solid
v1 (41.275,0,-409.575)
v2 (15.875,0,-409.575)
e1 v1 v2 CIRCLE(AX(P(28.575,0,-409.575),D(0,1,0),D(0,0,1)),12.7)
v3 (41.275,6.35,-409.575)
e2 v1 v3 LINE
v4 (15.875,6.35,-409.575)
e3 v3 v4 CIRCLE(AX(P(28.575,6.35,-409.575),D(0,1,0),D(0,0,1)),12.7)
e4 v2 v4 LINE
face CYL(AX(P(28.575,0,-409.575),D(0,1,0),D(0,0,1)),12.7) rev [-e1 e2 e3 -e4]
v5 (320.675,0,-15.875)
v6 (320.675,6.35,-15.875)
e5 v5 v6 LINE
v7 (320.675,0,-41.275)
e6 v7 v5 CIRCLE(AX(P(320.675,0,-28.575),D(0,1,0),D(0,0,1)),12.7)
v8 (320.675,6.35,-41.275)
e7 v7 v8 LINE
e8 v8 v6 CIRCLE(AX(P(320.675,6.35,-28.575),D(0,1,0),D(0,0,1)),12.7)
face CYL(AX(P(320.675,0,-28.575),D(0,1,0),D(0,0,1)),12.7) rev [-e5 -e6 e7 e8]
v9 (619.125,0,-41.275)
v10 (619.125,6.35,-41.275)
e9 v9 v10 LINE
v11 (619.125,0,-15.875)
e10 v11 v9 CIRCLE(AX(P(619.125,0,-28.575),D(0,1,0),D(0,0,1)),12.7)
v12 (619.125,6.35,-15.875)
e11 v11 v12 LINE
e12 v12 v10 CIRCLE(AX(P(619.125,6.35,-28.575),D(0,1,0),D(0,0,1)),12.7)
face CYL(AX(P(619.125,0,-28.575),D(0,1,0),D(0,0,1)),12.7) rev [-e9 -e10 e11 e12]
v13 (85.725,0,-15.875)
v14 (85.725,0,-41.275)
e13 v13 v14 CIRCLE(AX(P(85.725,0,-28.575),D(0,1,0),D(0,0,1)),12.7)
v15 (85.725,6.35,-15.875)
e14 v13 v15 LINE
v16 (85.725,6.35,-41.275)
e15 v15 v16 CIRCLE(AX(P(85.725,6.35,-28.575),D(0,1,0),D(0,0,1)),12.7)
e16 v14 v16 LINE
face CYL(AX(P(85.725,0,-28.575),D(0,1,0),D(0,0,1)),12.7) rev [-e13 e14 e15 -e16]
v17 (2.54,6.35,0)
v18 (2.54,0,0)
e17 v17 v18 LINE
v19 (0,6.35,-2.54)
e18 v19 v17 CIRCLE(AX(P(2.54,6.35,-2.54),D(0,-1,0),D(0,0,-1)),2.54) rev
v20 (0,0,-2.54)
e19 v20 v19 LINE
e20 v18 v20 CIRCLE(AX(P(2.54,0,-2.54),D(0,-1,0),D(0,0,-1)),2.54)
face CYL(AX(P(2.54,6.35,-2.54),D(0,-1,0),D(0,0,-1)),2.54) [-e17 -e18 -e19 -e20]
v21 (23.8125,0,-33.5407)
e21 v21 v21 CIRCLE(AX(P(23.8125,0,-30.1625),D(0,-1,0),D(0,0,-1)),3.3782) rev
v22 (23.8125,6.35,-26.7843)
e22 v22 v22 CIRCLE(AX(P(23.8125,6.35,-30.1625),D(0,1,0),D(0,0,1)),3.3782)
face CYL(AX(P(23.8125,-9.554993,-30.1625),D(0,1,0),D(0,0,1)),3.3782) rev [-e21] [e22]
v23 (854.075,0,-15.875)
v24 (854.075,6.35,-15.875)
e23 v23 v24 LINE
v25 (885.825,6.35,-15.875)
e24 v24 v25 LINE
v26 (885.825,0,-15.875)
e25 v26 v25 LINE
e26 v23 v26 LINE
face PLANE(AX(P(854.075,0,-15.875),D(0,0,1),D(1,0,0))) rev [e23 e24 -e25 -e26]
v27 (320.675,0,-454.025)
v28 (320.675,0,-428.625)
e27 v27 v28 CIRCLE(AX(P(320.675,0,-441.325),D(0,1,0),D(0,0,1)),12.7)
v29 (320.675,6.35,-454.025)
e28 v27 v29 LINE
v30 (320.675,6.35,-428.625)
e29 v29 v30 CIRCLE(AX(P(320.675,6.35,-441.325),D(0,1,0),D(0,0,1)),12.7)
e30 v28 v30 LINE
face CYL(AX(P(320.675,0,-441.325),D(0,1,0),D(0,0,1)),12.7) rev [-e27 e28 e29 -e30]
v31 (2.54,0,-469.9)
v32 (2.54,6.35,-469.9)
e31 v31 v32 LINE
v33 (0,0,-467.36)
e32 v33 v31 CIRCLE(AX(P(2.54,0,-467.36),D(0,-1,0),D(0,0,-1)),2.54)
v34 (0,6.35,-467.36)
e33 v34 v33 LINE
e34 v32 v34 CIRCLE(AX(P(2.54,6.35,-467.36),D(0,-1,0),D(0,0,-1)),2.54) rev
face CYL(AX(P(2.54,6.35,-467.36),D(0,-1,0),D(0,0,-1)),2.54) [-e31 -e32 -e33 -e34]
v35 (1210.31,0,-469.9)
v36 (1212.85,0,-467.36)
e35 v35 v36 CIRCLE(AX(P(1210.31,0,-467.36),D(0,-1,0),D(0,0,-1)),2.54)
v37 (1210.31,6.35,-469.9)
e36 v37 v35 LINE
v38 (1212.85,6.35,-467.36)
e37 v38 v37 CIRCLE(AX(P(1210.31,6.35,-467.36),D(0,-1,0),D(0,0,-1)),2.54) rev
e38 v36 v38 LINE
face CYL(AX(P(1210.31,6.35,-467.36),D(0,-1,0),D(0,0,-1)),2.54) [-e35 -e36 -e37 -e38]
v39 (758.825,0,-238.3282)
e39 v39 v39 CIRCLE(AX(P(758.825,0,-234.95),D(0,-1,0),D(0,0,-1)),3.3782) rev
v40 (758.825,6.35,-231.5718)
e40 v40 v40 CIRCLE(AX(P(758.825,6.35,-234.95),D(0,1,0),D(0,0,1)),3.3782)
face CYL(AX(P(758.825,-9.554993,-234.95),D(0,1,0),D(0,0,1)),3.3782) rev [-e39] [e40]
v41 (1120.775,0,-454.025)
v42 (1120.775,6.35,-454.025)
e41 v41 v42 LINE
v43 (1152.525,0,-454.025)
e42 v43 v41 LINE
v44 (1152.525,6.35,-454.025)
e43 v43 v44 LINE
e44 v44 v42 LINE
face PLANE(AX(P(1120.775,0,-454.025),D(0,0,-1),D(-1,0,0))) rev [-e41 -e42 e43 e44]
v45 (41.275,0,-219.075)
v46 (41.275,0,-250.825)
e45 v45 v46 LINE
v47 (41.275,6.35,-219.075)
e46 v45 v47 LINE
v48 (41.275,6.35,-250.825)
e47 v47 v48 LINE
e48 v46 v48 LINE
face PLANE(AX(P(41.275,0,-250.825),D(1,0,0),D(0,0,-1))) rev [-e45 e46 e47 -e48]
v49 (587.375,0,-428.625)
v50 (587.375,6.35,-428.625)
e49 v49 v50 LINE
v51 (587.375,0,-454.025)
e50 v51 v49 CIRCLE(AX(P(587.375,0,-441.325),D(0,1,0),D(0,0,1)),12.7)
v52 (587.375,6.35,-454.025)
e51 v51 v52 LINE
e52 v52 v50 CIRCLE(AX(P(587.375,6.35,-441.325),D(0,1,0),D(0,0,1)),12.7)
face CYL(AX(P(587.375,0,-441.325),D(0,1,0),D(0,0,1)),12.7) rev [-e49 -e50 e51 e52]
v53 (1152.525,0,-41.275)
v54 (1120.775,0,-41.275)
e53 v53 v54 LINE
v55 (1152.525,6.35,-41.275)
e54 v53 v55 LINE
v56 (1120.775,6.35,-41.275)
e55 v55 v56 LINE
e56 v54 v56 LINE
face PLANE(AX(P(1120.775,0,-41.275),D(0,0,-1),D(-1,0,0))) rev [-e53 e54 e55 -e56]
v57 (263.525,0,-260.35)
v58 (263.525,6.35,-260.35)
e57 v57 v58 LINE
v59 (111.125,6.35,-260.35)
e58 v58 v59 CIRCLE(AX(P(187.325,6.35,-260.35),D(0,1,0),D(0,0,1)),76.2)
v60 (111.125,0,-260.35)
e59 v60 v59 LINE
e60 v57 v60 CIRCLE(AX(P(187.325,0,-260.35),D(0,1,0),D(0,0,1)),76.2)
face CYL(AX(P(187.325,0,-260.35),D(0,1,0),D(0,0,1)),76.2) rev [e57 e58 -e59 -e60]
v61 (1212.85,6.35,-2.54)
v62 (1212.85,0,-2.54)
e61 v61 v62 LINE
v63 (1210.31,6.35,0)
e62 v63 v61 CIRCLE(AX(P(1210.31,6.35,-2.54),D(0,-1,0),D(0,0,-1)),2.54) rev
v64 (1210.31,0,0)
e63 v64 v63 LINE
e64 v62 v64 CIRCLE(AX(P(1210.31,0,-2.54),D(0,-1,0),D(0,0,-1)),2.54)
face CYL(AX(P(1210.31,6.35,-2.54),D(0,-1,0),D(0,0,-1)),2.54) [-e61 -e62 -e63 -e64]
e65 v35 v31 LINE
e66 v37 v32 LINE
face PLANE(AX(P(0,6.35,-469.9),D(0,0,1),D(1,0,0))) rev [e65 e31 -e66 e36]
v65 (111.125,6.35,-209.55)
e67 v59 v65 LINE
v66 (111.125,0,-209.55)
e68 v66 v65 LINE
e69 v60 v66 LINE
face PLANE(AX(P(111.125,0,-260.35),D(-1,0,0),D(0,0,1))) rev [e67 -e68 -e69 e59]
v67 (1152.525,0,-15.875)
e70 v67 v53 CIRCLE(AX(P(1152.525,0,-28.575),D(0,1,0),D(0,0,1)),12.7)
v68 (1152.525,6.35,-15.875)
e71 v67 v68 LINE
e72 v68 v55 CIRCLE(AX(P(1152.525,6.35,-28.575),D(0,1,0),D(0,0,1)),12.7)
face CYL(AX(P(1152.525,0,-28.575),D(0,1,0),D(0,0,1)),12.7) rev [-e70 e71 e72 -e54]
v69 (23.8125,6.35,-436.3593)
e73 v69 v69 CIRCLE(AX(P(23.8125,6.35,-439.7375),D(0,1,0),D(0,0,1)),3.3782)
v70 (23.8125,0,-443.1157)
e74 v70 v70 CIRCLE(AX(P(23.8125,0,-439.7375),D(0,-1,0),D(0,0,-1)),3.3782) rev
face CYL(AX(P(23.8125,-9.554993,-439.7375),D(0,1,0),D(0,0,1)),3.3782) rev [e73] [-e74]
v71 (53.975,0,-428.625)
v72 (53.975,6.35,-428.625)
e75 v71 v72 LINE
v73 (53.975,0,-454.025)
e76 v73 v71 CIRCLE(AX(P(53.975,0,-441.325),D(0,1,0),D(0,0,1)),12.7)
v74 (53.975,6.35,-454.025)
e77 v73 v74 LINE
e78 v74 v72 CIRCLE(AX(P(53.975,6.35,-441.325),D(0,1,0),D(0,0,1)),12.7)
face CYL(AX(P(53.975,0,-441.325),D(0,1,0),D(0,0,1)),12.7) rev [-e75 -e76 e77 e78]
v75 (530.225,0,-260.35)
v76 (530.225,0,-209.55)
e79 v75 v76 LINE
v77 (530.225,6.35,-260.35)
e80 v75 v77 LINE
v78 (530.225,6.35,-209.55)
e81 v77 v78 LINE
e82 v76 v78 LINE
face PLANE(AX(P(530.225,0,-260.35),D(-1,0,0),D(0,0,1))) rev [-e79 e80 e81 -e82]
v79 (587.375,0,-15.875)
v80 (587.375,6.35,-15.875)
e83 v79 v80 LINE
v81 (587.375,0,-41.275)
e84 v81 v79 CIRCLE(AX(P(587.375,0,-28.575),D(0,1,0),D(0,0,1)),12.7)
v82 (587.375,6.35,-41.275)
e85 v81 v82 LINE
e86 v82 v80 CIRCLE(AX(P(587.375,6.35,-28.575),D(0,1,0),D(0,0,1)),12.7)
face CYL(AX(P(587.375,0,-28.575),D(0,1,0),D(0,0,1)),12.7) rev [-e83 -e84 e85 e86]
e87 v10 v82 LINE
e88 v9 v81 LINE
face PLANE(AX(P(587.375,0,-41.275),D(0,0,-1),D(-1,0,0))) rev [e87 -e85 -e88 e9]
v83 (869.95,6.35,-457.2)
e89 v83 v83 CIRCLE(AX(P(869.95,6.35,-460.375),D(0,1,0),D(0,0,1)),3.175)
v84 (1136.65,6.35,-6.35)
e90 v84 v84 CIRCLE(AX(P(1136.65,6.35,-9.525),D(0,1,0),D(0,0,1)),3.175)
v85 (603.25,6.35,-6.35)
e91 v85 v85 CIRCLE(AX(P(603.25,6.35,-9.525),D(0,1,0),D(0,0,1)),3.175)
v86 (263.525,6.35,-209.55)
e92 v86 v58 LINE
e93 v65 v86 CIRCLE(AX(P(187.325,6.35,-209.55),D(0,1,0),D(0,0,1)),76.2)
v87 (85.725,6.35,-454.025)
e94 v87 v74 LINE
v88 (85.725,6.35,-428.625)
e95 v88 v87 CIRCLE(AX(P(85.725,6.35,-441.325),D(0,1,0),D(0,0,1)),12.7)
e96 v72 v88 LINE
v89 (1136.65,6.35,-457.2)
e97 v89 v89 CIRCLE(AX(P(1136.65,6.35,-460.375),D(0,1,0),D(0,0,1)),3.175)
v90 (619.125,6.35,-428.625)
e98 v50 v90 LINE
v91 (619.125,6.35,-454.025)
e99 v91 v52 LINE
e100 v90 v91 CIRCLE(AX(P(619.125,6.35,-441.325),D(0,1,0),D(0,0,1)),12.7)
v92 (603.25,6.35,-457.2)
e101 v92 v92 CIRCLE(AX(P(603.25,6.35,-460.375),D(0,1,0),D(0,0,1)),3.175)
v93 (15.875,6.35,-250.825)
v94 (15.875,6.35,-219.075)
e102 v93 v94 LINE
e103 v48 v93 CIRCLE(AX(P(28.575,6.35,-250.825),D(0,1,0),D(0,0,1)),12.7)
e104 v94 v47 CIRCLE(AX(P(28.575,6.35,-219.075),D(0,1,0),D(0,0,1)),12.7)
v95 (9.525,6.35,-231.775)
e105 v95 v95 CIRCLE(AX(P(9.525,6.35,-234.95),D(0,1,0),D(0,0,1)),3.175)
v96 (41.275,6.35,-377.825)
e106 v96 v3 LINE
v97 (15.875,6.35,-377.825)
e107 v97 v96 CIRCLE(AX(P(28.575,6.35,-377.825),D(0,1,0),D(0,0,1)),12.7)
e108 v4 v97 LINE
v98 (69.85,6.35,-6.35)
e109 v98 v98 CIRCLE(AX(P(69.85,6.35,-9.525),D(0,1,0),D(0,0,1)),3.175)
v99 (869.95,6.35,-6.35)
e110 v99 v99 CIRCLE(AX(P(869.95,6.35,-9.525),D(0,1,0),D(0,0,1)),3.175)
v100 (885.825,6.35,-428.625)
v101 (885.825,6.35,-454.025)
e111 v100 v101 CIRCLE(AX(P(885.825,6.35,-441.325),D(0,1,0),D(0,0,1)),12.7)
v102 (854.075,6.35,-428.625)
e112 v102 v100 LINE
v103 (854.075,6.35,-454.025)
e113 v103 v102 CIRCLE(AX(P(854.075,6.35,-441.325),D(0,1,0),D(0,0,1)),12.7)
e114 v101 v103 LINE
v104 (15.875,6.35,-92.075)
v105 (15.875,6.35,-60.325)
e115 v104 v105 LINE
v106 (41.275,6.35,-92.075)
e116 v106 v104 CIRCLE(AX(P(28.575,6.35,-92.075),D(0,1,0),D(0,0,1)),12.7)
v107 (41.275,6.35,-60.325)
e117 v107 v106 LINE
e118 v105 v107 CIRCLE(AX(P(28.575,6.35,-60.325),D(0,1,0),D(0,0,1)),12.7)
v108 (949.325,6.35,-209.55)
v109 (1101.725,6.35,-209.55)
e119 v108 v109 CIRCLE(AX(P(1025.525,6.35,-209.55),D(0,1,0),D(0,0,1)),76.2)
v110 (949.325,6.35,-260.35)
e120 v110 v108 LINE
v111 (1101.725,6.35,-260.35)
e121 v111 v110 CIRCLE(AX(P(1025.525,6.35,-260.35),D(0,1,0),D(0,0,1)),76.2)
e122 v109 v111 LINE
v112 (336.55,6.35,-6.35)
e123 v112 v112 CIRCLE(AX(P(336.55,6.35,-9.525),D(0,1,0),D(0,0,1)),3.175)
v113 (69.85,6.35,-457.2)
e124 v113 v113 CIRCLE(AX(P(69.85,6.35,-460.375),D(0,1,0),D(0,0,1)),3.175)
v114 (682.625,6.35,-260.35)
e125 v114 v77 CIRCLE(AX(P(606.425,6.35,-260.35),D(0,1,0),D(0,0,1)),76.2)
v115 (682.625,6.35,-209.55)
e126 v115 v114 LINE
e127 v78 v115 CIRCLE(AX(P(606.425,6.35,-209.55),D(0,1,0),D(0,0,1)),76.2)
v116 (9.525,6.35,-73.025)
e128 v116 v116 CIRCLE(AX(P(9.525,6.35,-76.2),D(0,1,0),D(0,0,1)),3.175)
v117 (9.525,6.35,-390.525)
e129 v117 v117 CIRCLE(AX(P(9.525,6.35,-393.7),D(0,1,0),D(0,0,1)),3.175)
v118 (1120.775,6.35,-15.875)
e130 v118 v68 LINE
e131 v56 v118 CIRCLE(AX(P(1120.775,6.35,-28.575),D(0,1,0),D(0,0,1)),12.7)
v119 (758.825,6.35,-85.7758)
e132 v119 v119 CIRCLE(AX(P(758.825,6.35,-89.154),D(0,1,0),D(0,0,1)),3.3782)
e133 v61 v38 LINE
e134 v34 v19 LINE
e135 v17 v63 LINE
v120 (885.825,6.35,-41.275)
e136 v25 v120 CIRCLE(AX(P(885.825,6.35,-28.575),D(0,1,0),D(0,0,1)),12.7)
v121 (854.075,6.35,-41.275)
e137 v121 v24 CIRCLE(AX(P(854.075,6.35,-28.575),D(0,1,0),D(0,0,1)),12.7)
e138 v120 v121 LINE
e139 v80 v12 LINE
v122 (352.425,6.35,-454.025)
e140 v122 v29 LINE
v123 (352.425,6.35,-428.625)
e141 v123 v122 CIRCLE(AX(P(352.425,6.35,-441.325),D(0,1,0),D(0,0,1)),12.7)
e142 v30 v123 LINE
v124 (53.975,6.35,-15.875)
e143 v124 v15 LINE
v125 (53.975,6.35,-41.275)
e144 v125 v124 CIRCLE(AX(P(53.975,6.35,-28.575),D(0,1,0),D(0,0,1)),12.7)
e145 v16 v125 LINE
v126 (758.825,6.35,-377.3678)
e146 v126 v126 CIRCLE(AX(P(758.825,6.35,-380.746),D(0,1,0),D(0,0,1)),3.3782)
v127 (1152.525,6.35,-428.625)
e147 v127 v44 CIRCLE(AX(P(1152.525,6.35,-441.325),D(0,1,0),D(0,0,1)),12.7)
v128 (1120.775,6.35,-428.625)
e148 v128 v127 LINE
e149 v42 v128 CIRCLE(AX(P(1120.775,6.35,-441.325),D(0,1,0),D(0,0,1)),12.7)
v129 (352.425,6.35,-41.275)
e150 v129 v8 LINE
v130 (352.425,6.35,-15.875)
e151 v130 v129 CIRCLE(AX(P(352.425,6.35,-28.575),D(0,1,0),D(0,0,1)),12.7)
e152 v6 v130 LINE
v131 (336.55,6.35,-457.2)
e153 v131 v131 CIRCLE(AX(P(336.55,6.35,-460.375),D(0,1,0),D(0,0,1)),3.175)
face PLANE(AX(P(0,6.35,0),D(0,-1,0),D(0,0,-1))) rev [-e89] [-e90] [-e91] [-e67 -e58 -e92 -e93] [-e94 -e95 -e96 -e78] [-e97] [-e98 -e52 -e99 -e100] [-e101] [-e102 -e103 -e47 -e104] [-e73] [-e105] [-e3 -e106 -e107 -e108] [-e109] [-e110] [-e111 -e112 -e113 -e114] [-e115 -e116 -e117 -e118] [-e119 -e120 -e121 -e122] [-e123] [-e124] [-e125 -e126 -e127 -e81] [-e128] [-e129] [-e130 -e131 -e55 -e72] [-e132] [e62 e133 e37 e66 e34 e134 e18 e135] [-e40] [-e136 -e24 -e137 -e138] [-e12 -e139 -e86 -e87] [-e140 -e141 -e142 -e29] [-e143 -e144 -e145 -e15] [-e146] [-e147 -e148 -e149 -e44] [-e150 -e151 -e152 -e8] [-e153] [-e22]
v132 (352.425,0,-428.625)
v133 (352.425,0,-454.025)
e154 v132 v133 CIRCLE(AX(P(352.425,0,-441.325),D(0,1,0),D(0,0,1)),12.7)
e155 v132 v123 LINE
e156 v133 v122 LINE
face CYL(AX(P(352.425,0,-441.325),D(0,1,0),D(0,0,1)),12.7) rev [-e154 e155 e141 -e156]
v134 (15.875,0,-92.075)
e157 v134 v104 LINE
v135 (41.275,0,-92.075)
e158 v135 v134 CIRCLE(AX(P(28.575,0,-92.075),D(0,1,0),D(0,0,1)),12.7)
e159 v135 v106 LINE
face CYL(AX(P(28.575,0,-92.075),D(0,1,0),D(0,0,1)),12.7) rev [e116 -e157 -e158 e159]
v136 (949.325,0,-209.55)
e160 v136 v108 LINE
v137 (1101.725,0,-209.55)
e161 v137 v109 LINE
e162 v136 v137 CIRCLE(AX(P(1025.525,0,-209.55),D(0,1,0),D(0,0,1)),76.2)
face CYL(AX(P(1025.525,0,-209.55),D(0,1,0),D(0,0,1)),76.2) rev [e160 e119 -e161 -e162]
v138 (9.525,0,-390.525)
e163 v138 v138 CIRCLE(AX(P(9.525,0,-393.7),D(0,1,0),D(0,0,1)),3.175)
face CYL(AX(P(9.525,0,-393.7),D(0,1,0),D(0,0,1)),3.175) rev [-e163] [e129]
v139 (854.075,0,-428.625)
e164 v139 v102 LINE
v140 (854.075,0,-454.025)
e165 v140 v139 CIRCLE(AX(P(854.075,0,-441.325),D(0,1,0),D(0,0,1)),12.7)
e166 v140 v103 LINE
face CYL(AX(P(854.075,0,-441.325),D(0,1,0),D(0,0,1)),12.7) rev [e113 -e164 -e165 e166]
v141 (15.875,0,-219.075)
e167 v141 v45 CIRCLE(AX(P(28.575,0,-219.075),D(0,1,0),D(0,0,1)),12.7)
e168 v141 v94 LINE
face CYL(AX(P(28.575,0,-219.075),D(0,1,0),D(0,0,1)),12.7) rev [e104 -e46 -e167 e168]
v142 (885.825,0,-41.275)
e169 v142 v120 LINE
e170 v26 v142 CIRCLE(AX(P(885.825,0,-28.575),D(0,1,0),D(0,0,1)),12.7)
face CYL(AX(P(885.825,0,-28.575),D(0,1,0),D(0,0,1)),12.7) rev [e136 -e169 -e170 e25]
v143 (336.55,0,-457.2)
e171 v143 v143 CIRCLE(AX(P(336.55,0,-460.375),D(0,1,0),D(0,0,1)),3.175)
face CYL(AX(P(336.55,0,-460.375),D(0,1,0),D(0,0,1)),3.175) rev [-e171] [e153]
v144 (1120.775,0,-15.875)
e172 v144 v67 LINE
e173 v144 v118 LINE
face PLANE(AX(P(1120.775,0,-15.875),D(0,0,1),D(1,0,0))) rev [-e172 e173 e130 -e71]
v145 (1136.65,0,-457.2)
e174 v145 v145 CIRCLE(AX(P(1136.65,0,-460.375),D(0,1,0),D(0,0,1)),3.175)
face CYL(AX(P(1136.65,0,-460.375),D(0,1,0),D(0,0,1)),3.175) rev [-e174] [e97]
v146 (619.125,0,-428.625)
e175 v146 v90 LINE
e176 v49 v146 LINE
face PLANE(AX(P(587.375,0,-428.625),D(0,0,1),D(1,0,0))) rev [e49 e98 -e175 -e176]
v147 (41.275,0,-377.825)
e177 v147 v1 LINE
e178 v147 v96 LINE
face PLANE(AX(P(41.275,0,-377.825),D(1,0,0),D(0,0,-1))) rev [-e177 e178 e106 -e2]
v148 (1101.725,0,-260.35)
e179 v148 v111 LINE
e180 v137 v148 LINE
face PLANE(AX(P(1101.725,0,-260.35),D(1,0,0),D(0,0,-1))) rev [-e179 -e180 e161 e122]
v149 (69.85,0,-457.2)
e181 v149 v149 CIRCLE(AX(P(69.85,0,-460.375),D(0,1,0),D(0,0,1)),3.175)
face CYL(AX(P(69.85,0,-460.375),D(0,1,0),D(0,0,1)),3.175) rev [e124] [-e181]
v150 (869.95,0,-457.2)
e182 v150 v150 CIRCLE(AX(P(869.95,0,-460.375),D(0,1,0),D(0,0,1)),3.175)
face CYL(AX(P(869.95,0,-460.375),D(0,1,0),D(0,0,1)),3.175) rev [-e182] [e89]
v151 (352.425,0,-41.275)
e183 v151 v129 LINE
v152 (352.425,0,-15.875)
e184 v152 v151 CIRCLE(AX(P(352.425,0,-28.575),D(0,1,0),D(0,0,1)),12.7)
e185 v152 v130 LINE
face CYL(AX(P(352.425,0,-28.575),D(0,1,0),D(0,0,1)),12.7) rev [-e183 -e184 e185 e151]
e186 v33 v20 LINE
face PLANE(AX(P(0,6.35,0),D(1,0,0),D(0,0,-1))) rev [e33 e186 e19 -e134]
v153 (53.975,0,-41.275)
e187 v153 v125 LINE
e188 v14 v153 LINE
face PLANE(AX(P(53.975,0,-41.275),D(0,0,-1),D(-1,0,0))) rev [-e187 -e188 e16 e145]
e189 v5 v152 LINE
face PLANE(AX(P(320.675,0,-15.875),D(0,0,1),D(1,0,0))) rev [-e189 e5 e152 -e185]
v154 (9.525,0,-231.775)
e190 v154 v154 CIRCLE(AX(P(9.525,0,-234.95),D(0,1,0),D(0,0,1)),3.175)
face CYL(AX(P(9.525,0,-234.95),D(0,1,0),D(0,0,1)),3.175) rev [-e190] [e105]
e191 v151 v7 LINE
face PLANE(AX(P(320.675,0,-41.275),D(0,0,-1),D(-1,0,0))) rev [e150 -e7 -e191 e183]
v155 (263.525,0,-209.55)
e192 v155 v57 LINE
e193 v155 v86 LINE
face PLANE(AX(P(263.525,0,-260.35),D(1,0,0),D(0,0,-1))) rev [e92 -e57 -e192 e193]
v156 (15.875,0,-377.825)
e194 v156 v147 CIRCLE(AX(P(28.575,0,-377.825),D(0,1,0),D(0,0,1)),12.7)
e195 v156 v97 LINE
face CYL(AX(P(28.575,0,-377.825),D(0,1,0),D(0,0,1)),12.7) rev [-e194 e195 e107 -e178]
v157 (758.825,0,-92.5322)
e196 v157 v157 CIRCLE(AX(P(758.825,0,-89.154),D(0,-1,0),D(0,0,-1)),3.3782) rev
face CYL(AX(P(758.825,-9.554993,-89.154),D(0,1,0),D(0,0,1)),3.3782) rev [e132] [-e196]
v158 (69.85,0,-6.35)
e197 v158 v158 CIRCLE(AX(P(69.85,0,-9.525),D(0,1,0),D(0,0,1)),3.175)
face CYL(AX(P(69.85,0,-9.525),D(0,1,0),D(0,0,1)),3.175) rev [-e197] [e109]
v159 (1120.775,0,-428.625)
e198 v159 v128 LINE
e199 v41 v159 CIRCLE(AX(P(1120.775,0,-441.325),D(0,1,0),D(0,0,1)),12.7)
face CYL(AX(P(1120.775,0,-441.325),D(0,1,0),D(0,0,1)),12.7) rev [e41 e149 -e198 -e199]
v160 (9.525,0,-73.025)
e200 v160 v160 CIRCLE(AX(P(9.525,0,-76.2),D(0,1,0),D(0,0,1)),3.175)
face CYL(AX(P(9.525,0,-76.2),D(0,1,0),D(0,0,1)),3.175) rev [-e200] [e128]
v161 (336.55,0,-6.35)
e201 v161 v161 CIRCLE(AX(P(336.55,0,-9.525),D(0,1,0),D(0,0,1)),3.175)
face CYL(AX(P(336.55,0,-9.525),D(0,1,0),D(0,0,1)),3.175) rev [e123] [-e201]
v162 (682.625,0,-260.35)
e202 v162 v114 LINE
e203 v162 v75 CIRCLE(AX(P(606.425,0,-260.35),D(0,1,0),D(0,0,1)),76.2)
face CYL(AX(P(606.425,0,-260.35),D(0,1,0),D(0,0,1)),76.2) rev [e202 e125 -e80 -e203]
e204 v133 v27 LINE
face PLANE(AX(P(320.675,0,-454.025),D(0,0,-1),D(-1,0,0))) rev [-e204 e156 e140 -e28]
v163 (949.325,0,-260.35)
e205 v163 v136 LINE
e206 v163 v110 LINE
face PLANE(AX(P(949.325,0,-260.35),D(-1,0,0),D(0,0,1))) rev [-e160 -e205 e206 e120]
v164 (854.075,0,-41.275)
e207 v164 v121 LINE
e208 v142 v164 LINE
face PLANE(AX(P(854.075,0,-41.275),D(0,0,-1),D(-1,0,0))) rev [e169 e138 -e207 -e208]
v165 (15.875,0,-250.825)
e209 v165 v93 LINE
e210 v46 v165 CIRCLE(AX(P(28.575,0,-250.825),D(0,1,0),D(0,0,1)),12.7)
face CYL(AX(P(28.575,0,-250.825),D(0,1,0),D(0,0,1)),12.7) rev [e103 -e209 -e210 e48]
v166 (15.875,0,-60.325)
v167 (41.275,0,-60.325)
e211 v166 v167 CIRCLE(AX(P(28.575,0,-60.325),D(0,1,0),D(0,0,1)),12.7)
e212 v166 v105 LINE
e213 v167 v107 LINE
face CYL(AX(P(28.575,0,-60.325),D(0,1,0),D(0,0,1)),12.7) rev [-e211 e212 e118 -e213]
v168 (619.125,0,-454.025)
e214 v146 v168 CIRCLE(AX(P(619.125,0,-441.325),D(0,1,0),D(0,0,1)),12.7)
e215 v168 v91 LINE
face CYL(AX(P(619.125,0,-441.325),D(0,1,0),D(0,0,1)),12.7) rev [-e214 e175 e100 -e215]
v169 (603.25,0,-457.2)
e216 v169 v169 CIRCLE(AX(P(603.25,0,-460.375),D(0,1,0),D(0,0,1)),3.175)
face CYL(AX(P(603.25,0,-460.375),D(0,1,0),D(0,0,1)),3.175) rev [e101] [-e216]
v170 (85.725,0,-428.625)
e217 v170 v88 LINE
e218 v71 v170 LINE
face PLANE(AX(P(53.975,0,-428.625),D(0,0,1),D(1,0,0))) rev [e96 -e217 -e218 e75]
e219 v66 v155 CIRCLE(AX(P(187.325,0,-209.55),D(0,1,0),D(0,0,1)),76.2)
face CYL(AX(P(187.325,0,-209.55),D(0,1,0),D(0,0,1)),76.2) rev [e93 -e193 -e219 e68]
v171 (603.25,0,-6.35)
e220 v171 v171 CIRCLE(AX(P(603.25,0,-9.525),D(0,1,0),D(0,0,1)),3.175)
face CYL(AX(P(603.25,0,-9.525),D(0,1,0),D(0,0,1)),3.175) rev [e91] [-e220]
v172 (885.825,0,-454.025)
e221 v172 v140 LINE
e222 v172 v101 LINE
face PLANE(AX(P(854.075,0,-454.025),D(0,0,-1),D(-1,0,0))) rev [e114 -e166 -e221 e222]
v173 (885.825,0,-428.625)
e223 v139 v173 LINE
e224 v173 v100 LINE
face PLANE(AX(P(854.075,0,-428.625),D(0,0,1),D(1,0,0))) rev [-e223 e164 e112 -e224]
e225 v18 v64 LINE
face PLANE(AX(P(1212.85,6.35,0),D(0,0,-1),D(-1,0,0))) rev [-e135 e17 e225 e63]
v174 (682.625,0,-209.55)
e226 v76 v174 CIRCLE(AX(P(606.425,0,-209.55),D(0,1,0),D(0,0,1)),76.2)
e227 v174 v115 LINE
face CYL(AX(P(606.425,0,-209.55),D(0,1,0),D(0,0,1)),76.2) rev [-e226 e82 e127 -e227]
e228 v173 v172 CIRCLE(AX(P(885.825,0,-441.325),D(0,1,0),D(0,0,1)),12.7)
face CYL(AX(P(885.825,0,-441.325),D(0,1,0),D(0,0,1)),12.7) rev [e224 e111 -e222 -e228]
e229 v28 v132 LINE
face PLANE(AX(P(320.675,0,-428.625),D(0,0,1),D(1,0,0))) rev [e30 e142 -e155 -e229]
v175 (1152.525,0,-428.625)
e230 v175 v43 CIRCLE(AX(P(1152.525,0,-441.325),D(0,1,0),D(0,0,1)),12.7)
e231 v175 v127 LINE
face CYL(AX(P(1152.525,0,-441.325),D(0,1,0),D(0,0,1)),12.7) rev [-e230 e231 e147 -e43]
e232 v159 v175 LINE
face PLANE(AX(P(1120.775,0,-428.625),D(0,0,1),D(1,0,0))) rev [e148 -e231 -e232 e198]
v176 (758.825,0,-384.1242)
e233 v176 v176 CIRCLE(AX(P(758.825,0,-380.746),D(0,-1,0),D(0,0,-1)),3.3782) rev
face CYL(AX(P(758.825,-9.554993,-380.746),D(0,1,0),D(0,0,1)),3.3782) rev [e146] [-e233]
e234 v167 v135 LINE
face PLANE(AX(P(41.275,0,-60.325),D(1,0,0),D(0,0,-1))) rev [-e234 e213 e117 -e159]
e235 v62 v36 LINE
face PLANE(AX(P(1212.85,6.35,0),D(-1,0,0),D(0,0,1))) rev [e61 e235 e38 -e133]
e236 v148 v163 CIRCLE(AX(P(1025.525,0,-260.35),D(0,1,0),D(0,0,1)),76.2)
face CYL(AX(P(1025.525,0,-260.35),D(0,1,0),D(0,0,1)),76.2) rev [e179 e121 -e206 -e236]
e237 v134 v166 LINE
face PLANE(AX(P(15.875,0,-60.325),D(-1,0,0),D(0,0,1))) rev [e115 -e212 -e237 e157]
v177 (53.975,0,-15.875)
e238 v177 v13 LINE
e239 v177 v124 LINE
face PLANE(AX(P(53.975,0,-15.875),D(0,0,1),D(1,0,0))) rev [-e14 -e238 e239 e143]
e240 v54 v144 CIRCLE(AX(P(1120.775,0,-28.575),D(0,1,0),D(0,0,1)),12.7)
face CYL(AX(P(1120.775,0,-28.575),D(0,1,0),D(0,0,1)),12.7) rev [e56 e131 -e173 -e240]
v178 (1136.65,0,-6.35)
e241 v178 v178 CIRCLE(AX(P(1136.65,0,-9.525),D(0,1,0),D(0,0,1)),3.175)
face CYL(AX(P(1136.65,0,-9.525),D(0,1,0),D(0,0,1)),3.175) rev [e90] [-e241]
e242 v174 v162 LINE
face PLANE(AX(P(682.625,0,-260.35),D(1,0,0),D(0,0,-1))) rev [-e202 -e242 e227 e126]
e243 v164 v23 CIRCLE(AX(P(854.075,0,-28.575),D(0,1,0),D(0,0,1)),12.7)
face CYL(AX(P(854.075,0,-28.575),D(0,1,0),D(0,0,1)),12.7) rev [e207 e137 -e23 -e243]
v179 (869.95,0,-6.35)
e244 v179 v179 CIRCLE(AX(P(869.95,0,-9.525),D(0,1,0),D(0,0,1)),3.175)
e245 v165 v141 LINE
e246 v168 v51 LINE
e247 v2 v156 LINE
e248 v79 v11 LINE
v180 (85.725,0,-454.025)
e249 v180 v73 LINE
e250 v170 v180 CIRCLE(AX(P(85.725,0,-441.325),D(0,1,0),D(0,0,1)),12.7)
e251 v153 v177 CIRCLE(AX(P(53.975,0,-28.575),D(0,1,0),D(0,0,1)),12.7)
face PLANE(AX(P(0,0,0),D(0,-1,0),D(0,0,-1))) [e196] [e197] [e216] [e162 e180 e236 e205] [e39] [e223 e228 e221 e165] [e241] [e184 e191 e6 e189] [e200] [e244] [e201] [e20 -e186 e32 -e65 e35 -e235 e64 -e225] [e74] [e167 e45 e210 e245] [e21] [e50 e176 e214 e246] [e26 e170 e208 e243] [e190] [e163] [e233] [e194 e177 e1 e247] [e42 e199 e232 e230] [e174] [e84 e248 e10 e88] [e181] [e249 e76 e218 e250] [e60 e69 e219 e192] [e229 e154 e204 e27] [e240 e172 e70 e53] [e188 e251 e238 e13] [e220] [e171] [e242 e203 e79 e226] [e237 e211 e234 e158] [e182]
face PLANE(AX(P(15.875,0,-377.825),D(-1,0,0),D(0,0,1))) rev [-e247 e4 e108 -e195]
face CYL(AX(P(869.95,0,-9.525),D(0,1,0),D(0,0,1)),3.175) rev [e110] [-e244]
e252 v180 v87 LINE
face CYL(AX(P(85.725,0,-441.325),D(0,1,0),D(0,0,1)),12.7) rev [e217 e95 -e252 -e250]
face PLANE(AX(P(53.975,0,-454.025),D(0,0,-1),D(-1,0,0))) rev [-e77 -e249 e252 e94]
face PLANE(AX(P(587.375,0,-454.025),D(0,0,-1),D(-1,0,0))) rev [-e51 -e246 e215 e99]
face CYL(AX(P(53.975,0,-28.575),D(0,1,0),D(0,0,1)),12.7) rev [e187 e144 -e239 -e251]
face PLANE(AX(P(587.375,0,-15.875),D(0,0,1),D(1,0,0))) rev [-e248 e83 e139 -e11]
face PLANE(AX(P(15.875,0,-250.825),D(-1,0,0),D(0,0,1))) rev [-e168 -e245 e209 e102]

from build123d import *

# Parameters (mm, degrees)
SKETCH1_W           = 1212.85
SKETCH1_H           = 469.9
BOSS_EXTRUDE1_DEPTH = 6.35
CUT_EXTRUDE1_DEPTH  = 1301.711903152
SKETCH4_R           = 3.175
CUT_EXTRUDE3_DEPTH  = 1301.711903152
LPATTERN1_OUTLINE_R = 3.175
LPATTERN1_DEPTH     = 6.35
FILLET1_R           = 2.54
SKETCH5_R           = 3.3782
CUT_EXTRUDE4_DEPTH  = 6.35


# Read off the part's stored shape, not the designer's step: LPattern1
with BuildPart() as part:
    # Sketch1 → Boss-Extrude1 (new body)
    with BuildSketch(Plane(origin=(0, 0, 0), x_dir=(1, 0, 0), z_dir=(0, 1, 0))):
        with Locations((606.425, 234.95)):
            Rectangle(SKETCH1_W, SKETCH1_H)
    extrude(amount=BOSS_EXTRUDE1_DEPTH)

    # Sketch2 → Cut-Extrude1 (cut, through all)
    with BuildSketch(Plane(origin=(0, 6.35, 0), x_dir=(1, 0, 0), z_dir=(0, 1, 0))):
        with BuildLine():
            Line((263.525, 260.35), (263.525, 209.55))
            ThreePointArc((263.525, 209.55), (187.325, 133.35), (111.125, 209.55))
            Line((111.125, 209.55), (111.125, 260.35))
            ThreePointArc((111.125, 260.35), (187.325, 336.55), (263.525, 260.35))
        make_face()
        with BuildLine():
            Line((682.625, 260.35), (682.625, 209.55))
            ThreePointArc((682.625, 209.55), (606.425, 133.35), (530.225, 209.55))
            Line((530.225, 209.55), (530.225, 260.35))
            ThreePointArc((530.225, 260.35), (606.425, 336.55), (682.625, 260.35))
        make_face()
        with BuildLine():
            Line((1101.725, 260.35), (1101.725, 209.55))
            ThreePointArc((1101.725, 209.55), (1025.525, 133.35), (949.325, 209.55))
            Line((949.325, 209.55), (949.325, 260.35))
            ThreePointArc((949.325, 260.35), (1025.525, 336.55), (1101.725, 260.35))
        make_face()
    extrude(amount=-CUT_EXTRUDE1_DEPTH, mode=Mode.SUBTRACT)

    # Sketch4 → Cut-Extrude3 (cut, through all)
    with BuildSketch(Plane(origin=(0, 6.35, 0), x_dir=(1, 0, 0), z_dir=(0, 1, 0))):
        with Locations(Location((9.525, 393.7, 0), (0, 0, 270))):
            Circle(SKETCH4_R)
        with Locations(Location((9.525, 234.95, 0), (0, 0, 270))):
            Circle(SKETCH4_R)
        with Locations(Location((9.525, 76.2, 0), (0, 0, 270))):
            Circle(SKETCH4_R)
        with Locations(Location((69.85, 460.375, 0), (0, 0, 270))):
            Circle(SKETCH4_R)
        with Locations(Location((69.85, 9.525, 0), (0, 0, 270))):
            Circle(SKETCH4_R)
        with BuildLine():
            Line((41.275, 250.825), (41.275, 219.075))
            ThreePointArc((41.275, 219.075), (28.575, 206.375), (15.875, 219.075))
            Line((15.875, 219.075), (15.875, 250.825))
            ThreePointArc((15.875, 250.825), (28.575, 263.525), (41.275, 250.825))
        make_face()
        with BuildLine():
            Line((53.975, 454.025), (85.725, 454.025))
            ThreePointArc((85.725, 454.025), (98.425, 441.325), (85.725, 428.625))
            Line((85.725, 428.625), (53.975, 428.625))
            ThreePointArc((53.975, 428.625), (41.275, 441.325), (53.975, 454.025))
        make_face()
        with BuildLine():
            Line((53.975, 41.275), (85.725, 41.275))
            ThreePointArc((85.725, 41.275), (98.425, 28.575), (85.725, 15.875))
            Line((85.725, 15.875), (53.975, 15.875))
            ThreePointArc((53.975, 15.875), (41.275, 28.575), (53.975, 41.275))
        make_face()
        with BuildLine():
            Line((15.875, 60.325), (15.875, 92.075))
            ThreePointArc((15.875, 92.075), (28.575, 104.775), (41.275, 92.075))
            Line((41.275, 92.075), (41.275, 60.325))
            ThreePointArc((41.275, 60.325), (28.575, 47.625), (15.875, 60.325))
        make_face()
        with BuildLine():
            Line((15.875, 377.825), (15.875, 409.575))
            ThreePointArc((15.875, 409.575), (28.575, 422.275), (41.275, 409.575))
            Line((41.275, 409.575), (41.275, 377.825))
            ThreePointArc((41.275, 377.825), (28.575, 365.125), (15.875, 377.825))
        make_face()
    extrude(amount=-CUT_EXTRUDE3_DEPTH, mode=Mode.SUBTRACT)

    # LPattern1 outline → LPattern1 (cut)
    with BuildSketch(Plane(origin=(0, 0, 0), x_dir=(1, 0, 0), z_dir=(0, 1, 0))):
        with BuildLine():
            ThreePointArc((1120.775, 454.025), (1108.075, 441.325), (1120.775, 428.625))
            Line((1120.775, 428.625), (1152.525, 428.625))
            ThreePointArc((1152.525, 428.625), (1165.225, 441.325), (1152.525, 454.025))
            Line((1152.525, 454.025), (1120.775, 454.025))
        make_face()
        with BuildLine():
            ThreePointArc((854.075, 454.025), (841.375, 441.325), (854.075, 428.625))
            Line((854.075, 428.625), (885.825, 428.625))
            ThreePointArc((885.825, 428.625), (898.525, 441.325), (885.825, 454.025))
            Line((885.825, 454.025), (854.075, 454.025))
        make_face()
        with BuildLine():
            ThreePointArc((587.375, 454.025), (574.675, 441.325), (587.375, 428.625))
            Line((587.375, 428.625), (619.125, 428.625))
            ThreePointArc((619.125, 428.625), (631.825, 441.325), (619.125, 454.025))
            Line((619.125, 454.025), (587.375, 454.025))
        make_face()
        with BuildLine():
            ThreePointArc((320.675, 454.025), (307.975, 441.325), (320.675, 428.625))
            Line((320.675, 428.625), (352.425, 428.625))
            ThreePointArc((352.425, 428.625), (365.125, 441.325), (352.425, 454.025))
            Line((352.425, 454.025), (320.675, 454.025))
        make_face()
        with BuildLine():
            ThreePointArc((1120.775, 41.275), (1108.075, 28.575), (1120.775, 15.875))
            Line((1120.775, 15.875), (1152.525, 15.875))
            ThreePointArc((1152.525, 15.875), (1165.225, 28.575), (1152.525, 41.275))
            Line((1152.525, 41.275), (1120.775, 41.275))
        make_face()
        with BuildLine():
            ThreePointArc((854.075, 41.275), (841.375, 28.575), (854.075, 15.875))
            Line((854.075, 15.875), (885.825, 15.875))
            ThreePointArc((885.825, 15.875), (898.525, 28.575), (885.825, 41.275))
            Line((885.825, 41.275), (854.075, 41.275))
        make_face()
        with BuildLine():
            ThreePointArc((587.375, 41.275), (574.675, 28.575), (587.375, 15.875))
            Line((587.375, 15.875), (619.125, 15.875))
            ThreePointArc((619.125, 15.875), (631.825, 28.575), (619.125, 41.275))
            Line((619.125, 41.275), (587.375, 41.275))
        make_face()
        with BuildLine():
            ThreePointArc((320.675, 41.275), (307.975, 28.575), (320.675, 15.875))
            Line((320.675, 15.875), (352.425, 15.875))
            ThreePointArc((352.425, 15.875), (365.125, 28.575), (352.425, 41.275))
            Line((352.425, 41.275), (320.675, 41.275))
        make_face()
        with Locations((1136.65, 9.525)):
            Circle(LPATTERN1_OUTLINE_R)
        with Locations((1136.65, 460.375)):
            Circle(LPATTERN1_OUTLINE_R)
        with Locations((869.95, 9.525)):
            Circle(LPATTERN1_OUTLINE_R)
        with Locations((869.95, 460.375)):
            Circle(LPATTERN1_OUTLINE_R)
        with Locations((603.25, 9.525)):
            Circle(LPATTERN1_OUTLINE_R)
        with Locations((603.25, 460.375)):
            Circle(LPATTERN1_OUTLINE_R)
        with Locations((336.55, 9.525)):
            Circle(LPATTERN1_OUTLINE_R)
        with Locations((336.55, 460.375)):
            Circle(LPATTERN1_OUTLINE_R)
    extrude(amount=LPATTERN1_DEPTH, mode=Mode.SUBTRACT)

    # Fillet1
    fillet1_edges = [part.edges().sort_by_distance(p)[0] for p in [
        (0, 3.175, 0),
        (0, 3.175, -469.9),
        (1212.85, 3.175, -469.9),
        (1212.85, 3.175, 0),
    ]]
    fillet(fillet1_edges, radius=FILLET1_R)

    # Sketch5 → Cut-Extrude4 (cut)
    with BuildSketch(Plane(origin=(0, 6.35, 0), x_dir=(1, 0, 0), z_dir=(0, 1, 0))):
        with Locations(Location((23.8125, 439.7375, 0), (0, 0, 270))):
            Circle(SKETCH5_R)
        with Locations(Location((23.8125, 30.1625, 0), (0, 0, 270))):
            Circle(SKETCH5_R)
        with Locations(Location((758.825, 89.154, 0), (0, 0, 270))):
            Circle(SKETCH5_R)
        with Locations(Location((758.825, 234.95, 0), (0, 0, 270))):
            Circle(SKETCH5_R)
        with Locations(Location((758.825, 380.746, 0), (0, 0, 270))):
            Circle(SKETCH5_R)
    extrude(amount=-CUT_EXTRUDE4_DEPTH, mode=Mode.SUBTRACT)


solid = part.part
